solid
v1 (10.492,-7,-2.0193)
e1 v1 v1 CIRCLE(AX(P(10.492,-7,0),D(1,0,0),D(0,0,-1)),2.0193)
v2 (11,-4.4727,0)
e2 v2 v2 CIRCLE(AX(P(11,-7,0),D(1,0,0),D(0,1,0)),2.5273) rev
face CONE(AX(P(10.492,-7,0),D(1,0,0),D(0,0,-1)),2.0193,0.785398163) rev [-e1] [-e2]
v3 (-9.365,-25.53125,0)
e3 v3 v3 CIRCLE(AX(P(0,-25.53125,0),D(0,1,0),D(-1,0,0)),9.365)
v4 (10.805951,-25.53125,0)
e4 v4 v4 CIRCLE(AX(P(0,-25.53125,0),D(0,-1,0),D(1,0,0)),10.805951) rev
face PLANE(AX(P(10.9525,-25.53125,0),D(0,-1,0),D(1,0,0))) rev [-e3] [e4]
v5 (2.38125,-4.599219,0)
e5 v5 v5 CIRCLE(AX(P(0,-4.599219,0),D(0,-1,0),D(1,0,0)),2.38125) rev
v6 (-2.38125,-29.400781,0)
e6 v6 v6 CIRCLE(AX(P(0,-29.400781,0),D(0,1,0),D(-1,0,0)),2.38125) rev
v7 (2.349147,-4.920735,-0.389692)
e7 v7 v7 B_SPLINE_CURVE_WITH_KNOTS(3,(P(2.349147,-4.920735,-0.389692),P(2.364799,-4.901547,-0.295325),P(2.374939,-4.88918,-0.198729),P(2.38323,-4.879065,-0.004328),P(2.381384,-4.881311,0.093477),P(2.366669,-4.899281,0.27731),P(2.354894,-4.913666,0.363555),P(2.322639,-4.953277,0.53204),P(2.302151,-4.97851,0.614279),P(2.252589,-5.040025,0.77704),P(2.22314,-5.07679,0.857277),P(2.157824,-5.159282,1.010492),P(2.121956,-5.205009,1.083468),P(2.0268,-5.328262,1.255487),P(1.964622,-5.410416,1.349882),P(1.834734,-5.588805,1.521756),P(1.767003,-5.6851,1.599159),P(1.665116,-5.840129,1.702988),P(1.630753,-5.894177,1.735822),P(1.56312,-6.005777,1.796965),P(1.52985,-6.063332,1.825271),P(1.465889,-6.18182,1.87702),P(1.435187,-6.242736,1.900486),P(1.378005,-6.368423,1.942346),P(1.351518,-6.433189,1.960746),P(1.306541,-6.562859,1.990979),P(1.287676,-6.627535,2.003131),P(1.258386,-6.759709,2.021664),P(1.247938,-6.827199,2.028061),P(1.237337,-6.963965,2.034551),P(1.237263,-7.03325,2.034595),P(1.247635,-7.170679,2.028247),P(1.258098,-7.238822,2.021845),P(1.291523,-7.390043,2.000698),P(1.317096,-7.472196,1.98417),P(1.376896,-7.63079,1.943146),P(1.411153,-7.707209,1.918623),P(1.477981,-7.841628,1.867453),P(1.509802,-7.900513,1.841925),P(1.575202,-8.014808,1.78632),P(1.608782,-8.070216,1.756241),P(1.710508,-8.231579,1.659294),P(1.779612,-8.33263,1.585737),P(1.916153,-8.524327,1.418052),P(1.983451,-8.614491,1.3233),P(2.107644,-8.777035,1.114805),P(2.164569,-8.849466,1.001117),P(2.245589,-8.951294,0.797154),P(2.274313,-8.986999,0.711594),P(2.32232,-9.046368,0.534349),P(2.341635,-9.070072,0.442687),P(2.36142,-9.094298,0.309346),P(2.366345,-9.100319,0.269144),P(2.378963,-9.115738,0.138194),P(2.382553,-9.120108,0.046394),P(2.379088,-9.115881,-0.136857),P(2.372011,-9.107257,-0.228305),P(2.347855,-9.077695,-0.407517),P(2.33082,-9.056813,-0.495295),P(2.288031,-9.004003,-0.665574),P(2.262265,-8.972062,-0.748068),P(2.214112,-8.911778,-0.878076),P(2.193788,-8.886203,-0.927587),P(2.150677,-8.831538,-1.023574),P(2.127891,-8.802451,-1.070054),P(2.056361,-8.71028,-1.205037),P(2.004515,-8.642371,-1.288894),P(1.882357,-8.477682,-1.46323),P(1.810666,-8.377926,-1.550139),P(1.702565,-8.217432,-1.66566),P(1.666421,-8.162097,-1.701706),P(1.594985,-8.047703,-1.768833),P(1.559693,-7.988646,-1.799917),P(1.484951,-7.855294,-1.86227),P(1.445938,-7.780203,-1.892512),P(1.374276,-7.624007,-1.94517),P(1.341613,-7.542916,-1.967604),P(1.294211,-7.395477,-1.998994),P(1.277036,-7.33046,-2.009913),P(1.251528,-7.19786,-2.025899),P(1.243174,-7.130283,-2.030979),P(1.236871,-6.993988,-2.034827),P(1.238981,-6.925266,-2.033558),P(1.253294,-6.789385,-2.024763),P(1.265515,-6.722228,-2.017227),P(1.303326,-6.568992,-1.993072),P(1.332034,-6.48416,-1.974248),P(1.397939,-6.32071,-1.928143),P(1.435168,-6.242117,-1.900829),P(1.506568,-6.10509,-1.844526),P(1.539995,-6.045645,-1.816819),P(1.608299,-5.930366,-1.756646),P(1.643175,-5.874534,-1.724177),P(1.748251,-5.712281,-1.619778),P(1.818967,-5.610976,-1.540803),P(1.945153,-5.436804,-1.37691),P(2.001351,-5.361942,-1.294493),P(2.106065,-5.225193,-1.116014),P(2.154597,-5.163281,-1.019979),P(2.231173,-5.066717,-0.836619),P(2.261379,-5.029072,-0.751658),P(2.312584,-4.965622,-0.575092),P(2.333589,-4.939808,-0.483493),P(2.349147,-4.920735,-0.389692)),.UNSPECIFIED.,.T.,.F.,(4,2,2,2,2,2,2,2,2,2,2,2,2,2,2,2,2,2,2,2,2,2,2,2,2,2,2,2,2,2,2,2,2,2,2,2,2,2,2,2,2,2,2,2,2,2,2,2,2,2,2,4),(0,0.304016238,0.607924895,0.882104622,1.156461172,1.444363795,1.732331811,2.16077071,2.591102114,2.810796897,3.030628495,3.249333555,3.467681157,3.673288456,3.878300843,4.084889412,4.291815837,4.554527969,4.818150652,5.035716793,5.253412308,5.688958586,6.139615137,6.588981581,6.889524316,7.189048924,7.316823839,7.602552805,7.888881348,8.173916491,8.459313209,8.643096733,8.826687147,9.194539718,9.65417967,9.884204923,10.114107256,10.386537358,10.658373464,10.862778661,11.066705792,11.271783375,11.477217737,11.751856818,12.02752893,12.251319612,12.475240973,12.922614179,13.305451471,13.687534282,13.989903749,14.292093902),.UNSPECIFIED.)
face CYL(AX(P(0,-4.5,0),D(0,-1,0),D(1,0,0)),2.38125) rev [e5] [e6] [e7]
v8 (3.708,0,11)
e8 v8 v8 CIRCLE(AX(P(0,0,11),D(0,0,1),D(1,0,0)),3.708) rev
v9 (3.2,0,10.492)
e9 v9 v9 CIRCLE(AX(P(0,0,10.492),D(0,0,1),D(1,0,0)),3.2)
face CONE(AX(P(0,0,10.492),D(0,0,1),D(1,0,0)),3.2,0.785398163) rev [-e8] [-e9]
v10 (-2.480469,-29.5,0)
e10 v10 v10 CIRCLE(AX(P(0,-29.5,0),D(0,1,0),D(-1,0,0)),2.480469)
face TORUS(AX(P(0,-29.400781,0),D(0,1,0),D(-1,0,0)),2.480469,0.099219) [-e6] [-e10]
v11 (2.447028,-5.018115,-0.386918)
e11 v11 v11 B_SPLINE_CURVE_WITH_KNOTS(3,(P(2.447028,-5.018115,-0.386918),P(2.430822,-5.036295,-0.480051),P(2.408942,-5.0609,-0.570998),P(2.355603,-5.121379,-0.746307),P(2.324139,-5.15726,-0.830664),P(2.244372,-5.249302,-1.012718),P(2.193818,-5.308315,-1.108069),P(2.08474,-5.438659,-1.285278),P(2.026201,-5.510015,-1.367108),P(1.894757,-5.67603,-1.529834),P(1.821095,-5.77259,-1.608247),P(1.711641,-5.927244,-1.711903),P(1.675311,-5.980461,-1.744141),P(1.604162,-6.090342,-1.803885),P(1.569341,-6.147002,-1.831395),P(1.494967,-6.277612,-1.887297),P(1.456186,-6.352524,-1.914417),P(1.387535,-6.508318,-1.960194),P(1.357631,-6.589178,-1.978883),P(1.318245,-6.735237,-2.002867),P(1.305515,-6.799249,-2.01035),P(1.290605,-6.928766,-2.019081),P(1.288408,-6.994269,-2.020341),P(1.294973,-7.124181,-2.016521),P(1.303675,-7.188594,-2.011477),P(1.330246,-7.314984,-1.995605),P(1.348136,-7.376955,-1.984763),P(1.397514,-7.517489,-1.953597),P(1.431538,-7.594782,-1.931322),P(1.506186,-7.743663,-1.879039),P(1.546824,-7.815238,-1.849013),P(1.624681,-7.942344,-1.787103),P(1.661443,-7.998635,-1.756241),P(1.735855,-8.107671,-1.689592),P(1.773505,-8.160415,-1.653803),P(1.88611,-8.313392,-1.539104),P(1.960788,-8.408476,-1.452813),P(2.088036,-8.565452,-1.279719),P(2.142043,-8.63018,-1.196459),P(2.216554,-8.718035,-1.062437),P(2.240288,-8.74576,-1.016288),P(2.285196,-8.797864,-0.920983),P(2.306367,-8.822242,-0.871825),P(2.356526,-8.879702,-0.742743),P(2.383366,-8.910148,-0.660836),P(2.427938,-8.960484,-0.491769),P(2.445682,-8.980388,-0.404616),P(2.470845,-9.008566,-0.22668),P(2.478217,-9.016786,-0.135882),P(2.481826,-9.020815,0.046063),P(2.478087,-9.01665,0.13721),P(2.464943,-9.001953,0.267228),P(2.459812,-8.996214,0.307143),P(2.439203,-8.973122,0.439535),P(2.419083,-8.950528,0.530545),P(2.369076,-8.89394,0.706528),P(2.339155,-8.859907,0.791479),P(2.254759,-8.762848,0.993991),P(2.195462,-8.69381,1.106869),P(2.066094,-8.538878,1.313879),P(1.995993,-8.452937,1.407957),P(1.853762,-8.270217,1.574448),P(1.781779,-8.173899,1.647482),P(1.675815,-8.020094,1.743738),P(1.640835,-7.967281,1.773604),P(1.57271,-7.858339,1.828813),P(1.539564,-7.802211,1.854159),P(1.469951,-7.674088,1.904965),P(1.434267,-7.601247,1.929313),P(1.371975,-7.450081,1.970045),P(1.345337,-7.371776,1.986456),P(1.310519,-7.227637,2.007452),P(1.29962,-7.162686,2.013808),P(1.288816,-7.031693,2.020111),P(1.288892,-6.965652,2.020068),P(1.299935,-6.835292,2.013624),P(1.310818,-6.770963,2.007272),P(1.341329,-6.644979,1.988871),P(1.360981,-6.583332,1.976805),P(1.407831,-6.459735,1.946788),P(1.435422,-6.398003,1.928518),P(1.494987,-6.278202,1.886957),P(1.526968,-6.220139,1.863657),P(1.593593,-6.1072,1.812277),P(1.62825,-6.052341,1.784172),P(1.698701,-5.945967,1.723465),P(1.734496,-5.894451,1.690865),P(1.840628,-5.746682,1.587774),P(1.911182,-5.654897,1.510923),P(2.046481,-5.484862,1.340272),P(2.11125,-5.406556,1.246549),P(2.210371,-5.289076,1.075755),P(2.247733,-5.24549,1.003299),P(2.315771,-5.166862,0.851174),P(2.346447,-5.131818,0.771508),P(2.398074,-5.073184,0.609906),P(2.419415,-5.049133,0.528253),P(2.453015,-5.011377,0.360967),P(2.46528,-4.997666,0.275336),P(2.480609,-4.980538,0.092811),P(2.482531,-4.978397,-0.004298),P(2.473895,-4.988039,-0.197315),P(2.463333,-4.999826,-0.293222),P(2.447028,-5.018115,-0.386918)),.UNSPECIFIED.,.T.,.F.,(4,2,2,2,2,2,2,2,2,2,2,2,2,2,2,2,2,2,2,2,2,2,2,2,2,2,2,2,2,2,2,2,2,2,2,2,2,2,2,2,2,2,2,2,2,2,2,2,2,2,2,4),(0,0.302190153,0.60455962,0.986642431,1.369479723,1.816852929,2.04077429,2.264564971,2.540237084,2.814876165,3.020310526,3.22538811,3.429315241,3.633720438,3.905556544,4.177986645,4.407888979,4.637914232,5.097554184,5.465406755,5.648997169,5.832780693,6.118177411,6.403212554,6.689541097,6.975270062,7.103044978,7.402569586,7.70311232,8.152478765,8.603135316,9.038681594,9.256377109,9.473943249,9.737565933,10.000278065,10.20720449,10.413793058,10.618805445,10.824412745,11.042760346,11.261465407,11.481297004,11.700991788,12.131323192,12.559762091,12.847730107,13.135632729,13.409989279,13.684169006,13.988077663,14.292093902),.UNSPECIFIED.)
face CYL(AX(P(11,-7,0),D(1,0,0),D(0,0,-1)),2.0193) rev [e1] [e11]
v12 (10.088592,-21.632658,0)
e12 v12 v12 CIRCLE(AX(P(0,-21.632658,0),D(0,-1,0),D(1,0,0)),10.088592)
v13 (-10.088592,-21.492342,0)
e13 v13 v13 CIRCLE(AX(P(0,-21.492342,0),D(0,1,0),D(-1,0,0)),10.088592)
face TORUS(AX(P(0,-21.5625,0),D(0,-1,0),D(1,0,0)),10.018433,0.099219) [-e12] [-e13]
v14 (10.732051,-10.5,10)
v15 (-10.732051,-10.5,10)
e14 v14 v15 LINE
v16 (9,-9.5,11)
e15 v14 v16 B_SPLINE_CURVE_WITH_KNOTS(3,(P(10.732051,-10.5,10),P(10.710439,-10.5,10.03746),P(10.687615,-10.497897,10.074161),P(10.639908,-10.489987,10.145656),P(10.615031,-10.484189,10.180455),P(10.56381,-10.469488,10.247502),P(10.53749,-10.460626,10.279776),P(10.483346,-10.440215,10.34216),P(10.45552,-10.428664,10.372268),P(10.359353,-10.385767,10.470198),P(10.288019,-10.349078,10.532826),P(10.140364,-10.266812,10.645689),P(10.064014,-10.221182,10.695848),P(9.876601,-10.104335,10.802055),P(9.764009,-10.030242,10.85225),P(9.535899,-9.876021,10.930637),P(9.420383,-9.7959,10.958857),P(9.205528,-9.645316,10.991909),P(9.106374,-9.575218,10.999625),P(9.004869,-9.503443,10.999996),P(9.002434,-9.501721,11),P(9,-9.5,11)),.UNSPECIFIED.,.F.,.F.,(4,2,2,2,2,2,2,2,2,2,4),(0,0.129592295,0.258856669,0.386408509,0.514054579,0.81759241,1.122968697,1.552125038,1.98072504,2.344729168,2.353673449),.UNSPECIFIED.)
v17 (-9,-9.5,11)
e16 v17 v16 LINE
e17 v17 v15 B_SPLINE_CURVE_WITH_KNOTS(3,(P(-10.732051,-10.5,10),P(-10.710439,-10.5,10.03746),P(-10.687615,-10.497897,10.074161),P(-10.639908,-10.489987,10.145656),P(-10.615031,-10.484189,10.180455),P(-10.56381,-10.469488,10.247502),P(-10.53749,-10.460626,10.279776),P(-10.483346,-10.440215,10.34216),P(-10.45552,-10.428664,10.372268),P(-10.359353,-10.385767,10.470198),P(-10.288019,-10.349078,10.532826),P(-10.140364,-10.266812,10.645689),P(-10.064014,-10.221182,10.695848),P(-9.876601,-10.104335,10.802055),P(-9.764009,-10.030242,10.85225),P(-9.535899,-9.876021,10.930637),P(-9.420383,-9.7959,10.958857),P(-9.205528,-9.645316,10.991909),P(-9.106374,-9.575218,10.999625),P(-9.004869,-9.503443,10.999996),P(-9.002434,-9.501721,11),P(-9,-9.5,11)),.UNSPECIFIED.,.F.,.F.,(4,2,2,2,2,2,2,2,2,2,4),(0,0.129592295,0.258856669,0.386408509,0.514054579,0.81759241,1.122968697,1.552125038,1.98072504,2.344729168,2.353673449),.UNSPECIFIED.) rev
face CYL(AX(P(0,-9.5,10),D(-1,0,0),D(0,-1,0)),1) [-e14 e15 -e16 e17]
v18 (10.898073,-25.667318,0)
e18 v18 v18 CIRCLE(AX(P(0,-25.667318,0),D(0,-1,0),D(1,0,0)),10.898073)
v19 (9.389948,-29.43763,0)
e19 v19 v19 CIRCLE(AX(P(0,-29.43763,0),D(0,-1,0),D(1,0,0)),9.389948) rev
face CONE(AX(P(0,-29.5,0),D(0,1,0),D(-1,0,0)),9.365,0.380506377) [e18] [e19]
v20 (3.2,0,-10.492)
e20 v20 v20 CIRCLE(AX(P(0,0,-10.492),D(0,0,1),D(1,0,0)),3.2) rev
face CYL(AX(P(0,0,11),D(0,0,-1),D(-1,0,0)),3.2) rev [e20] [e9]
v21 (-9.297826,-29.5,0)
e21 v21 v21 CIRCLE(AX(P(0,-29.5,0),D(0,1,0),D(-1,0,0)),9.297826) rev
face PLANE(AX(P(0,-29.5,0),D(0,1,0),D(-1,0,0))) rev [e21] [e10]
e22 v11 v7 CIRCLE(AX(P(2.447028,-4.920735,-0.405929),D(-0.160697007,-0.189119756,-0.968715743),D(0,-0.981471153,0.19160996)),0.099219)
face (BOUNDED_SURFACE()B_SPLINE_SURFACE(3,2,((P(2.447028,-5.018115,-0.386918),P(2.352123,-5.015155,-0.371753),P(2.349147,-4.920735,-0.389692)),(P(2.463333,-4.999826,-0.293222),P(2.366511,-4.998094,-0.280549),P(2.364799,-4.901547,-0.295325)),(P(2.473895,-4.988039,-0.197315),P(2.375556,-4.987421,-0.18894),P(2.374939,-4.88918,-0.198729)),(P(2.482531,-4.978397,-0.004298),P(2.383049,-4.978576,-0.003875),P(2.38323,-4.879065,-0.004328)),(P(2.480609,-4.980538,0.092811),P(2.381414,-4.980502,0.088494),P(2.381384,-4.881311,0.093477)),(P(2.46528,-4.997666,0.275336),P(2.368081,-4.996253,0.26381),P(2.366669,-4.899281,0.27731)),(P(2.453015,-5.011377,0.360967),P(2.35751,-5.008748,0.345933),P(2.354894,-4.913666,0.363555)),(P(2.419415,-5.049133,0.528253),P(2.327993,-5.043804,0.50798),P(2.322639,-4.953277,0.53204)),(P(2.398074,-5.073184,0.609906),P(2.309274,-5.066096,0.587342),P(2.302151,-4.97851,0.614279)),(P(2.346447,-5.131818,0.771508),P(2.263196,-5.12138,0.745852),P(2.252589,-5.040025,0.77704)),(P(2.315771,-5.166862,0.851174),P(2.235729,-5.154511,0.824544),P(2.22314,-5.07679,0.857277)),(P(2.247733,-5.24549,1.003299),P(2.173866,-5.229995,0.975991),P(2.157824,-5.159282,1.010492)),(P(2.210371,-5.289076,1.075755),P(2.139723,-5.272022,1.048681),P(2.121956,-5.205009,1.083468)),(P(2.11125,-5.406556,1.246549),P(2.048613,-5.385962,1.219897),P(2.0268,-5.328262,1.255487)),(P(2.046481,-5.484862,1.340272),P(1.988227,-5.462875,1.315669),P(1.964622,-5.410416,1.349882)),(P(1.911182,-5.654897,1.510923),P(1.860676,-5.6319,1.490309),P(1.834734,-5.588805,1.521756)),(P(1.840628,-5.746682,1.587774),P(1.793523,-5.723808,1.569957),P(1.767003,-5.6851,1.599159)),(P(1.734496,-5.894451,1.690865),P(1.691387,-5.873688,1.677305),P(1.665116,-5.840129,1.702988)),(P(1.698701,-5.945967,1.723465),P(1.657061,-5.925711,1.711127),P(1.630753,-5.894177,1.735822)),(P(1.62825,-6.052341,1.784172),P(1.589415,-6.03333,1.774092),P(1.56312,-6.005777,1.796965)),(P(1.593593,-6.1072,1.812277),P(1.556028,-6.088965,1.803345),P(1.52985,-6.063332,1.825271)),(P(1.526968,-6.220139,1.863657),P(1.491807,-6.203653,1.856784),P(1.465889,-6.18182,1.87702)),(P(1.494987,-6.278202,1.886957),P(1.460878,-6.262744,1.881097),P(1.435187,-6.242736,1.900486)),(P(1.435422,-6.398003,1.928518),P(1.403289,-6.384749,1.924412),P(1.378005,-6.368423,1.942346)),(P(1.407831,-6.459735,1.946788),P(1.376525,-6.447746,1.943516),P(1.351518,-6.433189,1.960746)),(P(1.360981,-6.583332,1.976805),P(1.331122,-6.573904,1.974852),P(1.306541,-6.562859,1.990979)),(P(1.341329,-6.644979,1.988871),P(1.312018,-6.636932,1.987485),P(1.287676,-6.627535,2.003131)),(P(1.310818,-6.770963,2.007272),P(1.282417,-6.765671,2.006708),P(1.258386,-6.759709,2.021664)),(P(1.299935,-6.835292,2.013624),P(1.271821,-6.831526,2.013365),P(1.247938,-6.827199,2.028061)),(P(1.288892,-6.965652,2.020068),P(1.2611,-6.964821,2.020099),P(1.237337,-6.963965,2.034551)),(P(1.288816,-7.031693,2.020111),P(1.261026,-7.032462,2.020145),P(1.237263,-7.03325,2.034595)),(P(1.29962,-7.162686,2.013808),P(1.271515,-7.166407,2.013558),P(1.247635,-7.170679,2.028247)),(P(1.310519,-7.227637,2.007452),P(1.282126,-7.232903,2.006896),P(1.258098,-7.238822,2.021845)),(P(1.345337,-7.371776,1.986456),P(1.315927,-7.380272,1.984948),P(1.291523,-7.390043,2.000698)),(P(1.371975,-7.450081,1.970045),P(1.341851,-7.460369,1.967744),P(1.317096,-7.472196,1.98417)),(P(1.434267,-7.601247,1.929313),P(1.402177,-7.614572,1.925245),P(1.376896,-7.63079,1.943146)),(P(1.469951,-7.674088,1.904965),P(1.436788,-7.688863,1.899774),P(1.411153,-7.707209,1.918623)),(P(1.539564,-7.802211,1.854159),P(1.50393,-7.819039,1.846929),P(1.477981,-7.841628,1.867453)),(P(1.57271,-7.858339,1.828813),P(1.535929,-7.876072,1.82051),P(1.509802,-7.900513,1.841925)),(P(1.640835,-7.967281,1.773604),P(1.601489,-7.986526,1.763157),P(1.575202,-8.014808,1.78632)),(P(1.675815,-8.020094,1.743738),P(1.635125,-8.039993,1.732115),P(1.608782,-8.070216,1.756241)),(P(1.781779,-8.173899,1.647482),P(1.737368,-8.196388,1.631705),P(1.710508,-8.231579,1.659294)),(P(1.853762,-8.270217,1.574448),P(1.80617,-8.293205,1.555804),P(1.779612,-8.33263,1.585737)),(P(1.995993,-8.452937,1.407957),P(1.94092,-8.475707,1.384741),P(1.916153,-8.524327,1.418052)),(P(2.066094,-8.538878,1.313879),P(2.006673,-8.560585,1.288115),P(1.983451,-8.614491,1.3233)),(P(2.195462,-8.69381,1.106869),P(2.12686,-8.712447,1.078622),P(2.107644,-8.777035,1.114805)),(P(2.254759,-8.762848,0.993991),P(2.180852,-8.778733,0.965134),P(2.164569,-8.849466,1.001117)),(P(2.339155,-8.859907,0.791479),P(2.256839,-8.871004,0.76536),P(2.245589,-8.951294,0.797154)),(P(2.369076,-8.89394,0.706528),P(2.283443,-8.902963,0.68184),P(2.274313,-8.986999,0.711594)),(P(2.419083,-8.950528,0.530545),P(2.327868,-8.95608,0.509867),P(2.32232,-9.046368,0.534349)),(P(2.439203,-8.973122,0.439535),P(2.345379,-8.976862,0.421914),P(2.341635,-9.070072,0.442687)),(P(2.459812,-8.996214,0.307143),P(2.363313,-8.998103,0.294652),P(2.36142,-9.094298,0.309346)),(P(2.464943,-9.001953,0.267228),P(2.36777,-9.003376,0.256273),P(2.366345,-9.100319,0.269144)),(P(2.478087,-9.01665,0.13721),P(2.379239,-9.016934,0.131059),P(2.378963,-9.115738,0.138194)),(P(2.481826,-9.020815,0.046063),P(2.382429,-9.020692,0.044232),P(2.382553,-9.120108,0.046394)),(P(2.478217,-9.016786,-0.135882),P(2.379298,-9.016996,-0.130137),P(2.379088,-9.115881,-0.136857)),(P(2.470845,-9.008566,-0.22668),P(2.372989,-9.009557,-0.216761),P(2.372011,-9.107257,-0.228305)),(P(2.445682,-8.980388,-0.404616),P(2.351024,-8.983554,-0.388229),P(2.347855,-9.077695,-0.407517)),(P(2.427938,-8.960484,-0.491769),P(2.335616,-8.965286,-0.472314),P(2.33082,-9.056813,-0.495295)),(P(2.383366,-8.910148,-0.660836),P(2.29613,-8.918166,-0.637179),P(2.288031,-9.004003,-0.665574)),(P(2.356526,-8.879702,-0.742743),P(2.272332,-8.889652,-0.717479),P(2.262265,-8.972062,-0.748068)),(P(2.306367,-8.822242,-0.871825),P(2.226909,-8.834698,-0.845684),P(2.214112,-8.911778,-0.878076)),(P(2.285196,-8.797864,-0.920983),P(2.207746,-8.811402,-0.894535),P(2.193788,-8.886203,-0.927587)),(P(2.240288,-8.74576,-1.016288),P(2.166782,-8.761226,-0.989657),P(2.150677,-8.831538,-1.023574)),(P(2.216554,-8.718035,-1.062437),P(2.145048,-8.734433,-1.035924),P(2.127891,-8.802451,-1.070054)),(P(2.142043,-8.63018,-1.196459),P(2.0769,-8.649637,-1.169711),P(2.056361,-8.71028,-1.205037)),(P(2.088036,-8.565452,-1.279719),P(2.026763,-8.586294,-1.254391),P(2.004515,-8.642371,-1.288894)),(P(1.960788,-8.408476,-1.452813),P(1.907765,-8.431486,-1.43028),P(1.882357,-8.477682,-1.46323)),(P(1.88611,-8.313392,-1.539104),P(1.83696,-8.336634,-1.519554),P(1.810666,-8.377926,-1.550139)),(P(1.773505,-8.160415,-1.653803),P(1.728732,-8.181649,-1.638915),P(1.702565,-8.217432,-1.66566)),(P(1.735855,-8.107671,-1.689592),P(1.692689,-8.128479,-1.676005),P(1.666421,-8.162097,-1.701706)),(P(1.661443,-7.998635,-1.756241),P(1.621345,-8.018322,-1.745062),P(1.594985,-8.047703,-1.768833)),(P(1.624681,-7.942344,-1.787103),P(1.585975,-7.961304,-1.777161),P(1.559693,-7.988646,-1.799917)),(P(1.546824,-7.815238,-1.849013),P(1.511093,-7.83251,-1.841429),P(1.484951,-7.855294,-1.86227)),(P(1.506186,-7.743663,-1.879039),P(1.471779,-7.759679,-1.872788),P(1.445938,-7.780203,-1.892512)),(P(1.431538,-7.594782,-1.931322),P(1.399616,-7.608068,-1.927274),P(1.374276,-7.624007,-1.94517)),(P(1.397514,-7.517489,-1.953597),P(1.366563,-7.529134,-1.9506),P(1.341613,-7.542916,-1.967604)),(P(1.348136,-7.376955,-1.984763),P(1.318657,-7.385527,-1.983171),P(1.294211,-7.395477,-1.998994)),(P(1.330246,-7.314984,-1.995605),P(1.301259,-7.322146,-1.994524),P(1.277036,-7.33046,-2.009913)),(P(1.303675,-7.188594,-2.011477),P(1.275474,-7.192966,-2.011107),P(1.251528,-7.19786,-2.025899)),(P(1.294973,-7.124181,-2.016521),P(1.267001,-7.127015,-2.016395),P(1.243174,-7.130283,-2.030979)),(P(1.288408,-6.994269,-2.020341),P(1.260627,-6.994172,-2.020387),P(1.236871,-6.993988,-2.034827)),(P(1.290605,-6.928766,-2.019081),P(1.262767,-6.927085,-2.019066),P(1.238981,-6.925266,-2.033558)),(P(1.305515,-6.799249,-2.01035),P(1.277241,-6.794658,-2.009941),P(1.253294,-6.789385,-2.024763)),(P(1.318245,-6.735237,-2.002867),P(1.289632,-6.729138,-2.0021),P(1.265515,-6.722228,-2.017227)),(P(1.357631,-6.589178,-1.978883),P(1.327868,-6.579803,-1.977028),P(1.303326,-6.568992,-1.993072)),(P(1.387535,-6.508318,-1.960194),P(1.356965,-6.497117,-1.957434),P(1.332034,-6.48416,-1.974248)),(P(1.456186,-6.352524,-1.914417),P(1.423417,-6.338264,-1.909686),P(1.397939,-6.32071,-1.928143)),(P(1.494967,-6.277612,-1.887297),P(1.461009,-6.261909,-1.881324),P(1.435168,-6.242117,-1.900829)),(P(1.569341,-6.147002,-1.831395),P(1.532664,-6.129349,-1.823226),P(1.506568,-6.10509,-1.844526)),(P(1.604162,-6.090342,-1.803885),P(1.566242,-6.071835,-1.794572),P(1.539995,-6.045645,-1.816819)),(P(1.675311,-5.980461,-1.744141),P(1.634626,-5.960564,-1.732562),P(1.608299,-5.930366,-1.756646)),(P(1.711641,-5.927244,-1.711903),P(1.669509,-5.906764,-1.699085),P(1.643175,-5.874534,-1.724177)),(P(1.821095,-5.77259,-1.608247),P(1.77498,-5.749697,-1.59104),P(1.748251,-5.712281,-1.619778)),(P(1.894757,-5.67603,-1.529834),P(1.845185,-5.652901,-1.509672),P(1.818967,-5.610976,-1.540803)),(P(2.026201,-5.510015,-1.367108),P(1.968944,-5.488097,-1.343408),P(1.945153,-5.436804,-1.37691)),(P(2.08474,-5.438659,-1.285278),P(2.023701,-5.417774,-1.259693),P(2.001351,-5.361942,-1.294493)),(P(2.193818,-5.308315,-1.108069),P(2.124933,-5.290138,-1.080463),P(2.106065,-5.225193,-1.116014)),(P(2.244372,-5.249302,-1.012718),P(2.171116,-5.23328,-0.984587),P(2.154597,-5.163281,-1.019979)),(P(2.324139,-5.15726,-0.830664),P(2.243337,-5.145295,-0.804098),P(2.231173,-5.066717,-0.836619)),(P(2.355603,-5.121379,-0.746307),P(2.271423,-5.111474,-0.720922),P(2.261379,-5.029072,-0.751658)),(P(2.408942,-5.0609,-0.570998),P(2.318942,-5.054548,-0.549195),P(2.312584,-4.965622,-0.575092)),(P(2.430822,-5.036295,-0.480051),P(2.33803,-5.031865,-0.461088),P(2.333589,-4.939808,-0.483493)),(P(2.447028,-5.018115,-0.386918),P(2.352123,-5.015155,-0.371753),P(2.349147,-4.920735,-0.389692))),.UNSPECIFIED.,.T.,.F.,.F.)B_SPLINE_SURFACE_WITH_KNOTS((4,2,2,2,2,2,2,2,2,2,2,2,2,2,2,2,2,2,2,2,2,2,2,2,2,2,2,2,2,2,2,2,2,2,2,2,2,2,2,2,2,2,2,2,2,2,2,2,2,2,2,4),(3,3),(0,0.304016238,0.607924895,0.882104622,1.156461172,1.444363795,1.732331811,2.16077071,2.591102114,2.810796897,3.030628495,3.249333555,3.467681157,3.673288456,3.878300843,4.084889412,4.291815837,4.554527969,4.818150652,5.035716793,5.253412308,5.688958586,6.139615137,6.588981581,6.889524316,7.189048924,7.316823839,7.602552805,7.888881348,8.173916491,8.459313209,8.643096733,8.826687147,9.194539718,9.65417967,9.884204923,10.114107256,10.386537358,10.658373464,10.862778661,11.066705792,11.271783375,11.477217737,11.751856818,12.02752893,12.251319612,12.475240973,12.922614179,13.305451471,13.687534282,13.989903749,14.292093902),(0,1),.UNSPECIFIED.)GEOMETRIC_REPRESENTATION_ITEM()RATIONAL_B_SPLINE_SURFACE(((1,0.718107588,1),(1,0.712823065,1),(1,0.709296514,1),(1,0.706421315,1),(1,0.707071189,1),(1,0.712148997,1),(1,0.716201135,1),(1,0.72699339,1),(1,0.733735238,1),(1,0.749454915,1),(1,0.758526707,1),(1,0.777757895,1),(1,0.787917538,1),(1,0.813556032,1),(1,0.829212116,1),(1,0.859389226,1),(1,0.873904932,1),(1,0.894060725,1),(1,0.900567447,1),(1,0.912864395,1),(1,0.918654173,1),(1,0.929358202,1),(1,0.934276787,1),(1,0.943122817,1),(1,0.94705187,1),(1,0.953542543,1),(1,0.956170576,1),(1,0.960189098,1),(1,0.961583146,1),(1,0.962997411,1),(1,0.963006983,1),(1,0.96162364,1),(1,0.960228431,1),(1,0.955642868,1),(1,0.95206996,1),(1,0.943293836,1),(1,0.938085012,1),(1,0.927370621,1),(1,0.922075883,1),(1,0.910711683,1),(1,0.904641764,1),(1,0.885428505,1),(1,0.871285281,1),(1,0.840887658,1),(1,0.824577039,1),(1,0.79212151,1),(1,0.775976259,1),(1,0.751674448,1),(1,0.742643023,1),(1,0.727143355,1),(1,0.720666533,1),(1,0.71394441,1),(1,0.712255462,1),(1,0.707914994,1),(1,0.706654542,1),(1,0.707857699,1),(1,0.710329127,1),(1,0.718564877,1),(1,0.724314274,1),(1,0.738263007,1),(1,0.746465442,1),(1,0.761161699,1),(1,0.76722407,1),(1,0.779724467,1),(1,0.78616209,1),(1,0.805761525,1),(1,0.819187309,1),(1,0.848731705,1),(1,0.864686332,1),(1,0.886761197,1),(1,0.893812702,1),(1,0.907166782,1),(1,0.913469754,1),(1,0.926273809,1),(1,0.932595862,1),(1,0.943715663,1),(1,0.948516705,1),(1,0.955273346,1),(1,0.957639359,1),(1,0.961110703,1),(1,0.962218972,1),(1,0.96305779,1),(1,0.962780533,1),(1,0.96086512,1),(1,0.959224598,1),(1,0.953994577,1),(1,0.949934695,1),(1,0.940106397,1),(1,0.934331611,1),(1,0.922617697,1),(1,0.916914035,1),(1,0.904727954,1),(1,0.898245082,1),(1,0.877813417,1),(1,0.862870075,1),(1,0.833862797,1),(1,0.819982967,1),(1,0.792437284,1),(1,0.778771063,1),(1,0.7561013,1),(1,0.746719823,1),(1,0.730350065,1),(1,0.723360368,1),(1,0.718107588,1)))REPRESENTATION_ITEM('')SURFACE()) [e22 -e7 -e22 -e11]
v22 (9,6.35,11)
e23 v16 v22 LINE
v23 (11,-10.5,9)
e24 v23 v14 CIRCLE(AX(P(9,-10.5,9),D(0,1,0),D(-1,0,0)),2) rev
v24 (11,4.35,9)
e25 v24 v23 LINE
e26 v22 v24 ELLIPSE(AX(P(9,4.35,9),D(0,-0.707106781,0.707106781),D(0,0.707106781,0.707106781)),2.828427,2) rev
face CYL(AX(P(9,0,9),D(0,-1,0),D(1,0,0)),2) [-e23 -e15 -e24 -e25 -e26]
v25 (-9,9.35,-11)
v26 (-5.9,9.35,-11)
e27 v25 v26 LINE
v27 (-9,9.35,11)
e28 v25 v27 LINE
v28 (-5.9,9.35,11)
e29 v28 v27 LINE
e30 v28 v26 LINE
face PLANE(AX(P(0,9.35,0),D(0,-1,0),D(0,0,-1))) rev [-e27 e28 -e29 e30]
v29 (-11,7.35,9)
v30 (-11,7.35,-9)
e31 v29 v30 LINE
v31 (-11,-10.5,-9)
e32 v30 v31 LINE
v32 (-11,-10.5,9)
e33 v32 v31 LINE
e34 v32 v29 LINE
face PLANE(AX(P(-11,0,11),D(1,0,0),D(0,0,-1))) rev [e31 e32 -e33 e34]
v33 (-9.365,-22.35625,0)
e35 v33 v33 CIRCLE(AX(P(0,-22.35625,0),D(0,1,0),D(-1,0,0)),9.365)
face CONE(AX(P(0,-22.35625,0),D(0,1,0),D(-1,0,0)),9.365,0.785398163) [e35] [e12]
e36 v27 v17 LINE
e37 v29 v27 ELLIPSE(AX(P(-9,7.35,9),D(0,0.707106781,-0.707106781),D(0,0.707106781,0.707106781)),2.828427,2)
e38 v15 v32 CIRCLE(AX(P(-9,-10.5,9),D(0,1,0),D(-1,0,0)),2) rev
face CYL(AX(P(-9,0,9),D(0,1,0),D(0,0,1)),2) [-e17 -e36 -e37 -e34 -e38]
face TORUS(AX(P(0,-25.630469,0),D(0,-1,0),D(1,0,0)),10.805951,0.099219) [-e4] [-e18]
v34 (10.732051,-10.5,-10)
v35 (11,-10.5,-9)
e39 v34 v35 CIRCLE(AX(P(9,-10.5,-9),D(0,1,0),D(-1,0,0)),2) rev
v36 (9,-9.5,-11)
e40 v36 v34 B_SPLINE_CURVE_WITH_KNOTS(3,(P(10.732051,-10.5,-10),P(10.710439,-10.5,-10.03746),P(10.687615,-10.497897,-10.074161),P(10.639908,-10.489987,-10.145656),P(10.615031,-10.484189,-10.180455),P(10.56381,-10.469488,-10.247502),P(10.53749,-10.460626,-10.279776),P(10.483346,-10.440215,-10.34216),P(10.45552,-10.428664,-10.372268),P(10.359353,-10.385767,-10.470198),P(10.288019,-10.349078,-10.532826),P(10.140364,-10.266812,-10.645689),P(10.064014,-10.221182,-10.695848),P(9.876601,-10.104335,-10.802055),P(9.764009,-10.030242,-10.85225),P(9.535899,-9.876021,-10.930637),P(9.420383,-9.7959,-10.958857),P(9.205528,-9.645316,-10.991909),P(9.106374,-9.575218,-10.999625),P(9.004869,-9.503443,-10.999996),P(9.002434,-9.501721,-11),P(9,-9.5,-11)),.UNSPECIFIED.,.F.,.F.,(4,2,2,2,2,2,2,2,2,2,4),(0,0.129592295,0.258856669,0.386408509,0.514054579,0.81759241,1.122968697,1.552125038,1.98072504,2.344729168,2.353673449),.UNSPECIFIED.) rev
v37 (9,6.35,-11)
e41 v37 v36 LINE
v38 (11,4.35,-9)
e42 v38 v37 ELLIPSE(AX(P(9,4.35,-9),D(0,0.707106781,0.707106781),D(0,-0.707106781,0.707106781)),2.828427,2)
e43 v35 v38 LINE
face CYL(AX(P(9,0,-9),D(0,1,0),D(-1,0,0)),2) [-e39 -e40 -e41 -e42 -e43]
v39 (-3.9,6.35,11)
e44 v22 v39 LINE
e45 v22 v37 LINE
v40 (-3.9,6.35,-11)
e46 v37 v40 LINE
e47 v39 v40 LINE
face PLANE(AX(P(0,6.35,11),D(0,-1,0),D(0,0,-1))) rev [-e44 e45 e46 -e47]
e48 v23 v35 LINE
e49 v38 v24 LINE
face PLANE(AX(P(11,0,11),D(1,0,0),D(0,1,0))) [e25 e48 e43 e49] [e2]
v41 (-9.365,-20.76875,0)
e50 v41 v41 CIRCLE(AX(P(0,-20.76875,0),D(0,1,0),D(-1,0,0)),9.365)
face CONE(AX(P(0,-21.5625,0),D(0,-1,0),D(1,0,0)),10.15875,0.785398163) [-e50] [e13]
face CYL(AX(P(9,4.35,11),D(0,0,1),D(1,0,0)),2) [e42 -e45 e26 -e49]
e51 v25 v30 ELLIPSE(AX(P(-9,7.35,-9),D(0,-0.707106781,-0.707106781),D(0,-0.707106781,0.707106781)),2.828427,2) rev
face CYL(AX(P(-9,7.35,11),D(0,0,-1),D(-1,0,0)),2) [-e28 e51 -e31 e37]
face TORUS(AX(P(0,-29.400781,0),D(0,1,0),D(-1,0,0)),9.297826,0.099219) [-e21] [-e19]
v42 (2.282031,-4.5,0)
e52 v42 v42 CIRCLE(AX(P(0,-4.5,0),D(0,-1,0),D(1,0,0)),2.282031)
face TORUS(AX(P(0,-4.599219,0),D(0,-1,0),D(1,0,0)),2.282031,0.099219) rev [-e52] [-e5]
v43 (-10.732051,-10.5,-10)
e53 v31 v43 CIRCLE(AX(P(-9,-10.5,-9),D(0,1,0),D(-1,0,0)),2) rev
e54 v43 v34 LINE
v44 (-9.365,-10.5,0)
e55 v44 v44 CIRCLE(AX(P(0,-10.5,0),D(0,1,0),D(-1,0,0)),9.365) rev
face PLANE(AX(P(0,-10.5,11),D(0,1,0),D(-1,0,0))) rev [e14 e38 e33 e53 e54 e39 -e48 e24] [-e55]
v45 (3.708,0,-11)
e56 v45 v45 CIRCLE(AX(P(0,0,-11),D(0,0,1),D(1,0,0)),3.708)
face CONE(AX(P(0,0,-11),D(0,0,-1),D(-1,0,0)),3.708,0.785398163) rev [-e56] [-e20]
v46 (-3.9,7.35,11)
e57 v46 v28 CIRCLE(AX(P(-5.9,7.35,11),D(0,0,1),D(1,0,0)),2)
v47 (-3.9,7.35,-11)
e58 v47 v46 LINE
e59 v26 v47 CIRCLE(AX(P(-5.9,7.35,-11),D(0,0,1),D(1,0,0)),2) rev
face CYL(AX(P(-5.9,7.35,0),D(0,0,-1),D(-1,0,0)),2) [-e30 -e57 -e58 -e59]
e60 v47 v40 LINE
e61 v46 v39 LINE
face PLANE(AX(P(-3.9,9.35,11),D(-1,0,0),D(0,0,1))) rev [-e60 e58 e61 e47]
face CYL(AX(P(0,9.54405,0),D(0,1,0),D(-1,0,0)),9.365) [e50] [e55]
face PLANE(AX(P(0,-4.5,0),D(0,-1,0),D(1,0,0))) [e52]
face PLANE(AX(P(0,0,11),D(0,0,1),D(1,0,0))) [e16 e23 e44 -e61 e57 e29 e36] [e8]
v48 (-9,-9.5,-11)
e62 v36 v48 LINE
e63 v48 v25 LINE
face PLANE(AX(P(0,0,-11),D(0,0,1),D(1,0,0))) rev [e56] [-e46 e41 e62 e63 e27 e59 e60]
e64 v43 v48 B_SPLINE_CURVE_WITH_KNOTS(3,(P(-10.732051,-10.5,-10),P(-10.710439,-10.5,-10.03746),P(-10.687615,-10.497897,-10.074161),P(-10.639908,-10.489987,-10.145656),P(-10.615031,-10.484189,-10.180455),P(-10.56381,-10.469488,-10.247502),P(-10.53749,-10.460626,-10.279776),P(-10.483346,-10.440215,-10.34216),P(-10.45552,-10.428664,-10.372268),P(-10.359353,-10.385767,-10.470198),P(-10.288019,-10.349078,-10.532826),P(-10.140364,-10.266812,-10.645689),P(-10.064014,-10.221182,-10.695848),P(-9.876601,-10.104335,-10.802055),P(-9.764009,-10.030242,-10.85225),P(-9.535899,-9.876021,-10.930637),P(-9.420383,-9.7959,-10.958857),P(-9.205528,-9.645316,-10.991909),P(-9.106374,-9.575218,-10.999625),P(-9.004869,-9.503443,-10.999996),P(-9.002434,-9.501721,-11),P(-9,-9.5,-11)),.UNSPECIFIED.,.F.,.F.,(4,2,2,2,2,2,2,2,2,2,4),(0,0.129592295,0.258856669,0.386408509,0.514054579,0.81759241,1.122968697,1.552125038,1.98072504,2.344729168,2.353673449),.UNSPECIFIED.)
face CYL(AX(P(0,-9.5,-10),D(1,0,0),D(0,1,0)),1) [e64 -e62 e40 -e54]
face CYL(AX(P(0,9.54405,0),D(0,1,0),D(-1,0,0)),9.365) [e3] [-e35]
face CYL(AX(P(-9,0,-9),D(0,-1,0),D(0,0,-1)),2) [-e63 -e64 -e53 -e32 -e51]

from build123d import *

# Parameters (mm, degrees)
SKETCH1_R                   = 3.2
BOSS_EXTRUDE1_DEPTH         = 11
SKETCH3_R                   = 2.38125
CUT_EXTRUDE1_DEPTH          = 25
F_10_32_TAPPED_HOLE1_REACH  = 40.409
F_10_32_TAPPED_HOLE1_BORE_R = 2.0193
FILLET3_R                   = 0.09921875
CHAMFER1_SIZE               = 0.508
FILLET6_R                   = 1
SKETCH6_W                   = 7.1
SKETCH6_H                   = 22
BOSS_EXTRUDE2_DEPTH         = 3
FILLET7_R                   = 2
FILLET8_R                   = 2


with BuildPart() as part:
    # Sketch1 → Boss-Extrude1 (new, symmetric)
    # profile 1 of 3: a face of its own
    with BuildSketch(Plane.XY):
        with BuildLine():
            Line((-11, 6.35), (-11, 0))
            Line((-11, 0), (-6.35, 0))
            ThreePointArc((-6.35, 0), (-4.49012806, 4.490128061), (2e-09, 6.35))
            Line((2e-09, 6.35), (-11, 6.35))
        make_face()
    # profile 2 of 3: a face of its own
    with BuildSketch(Plane.XY):
        with BuildLine():
            Line((-6.35, 0), (-11, 0))
            Line((-11, 0), (-11, -10.5))
            Line((-11, -10.5), (11, -10.5))
            Line((11, -10.5), (11, 0))
            Line((11, 0), (6.35, 0))
            ThreePointArc((6.35, 0), (4.490128061, 4.49012806), (2e-09, 6.35))
            ThreePointArc((2e-09, 6.35), (-4.49012806, 4.490128061), (-6.35, 0))
        make_face()
        Circle(SKETCH1_R, mode=Mode.SUBTRACT)
    # profile 3 of 3: a face of its own
    with BuildSketch(Plane.XY):
        with BuildLine():
            Line((11, 6.35), (2e-09, 6.35))
            ThreePointArc((2e-09, 6.35), (4.490128061, 4.49012806), (6.35, 0))
            Line((6.35, 0), (11, 0))
            Line((11, 0), (11, 6.35))
        make_face()
    extrude(amount=BOSS_EXTRUDE1_DEPTH, both=True)

    # Sketch2 → Revolve1 (revolve)
    with BuildSketch(Plane.XY, mode=Mode.PRIVATE) as revolve1_sk:
        Polygon((0, -10), (9.365, -10), (9.365, -20.76875), (10.15875, -21.5625), (9.365, -22.35625), (9.365, -25.53125), (10.9525, -25.53125), (9.365, -29.5), (0, -29.5), align=None)
    revolve(revolve1_sk.sketch.rotate(Axis((0, 9.54404991, 0), (0, -1, 0)), 180), axis=Axis((0, 9.54404991, 0), (0, -1, 0)))

    # Sketch3 → Cut-Extrude1 (cut)
    with BuildSketch(Plane.XZ.offset(29.5)):
        Circle(SKETCH3_R)
    extrude(amount=-CUT_EXTRUDE1_DEPTH, mode=Mode.SUBTRACT)

    # #10-32 Tapped Hole1 bore → #10-32 Tapped Hole1 (cut, up to next)
    with BuildSketch(Plane(origin=(11, 0, 0), x_dir=(0, 0, -1), z_dir=(1, 0, 0)), mode=Mode.PRIVATE) as f_10_32_tapped_hole1_sk1:
        with Locations((0, -7)):
            Circle(F_10_32_TAPPED_HOLE1_BORE_R)
    f_10_32_tapped_hole1_tool1 = extrude(f_10_32_tapped_hole1_sk1.sketch, amount=-F_10_32_TAPPED_HOLE1_REACH, mode=Mode.PRIVATE) & part.part
    add(f_10_32_tapped_hole1_tool1.solids().sort_by_distance((11, -7, 0))[0], mode=Mode.SUBTRACT)

    # Fillet3
    fillet3_edges = [part.edges().sort_by_distance(p)[0] for p in [
        (10.15875, -21.5625, 0),
        (10.9525, -25.53125, 0),
        (9.365, -29.5, 0),
        (-2.38125, -4.5, 0),
        (-2.38125, -29.5, 0),
        (1.892404965, -8.410112563, -1.445390956),
    ]]
    fillet(fillet3_edges, radius=FILLET3_R)

    # Chamfer1
    chamfer1_edges = [part.edges().sort_by_distance(p)[0] for p in [
        (-3.2, 0, 11),
        (11, -7, 2.0193),
        (-3.2, 0, -11),
    ]]
    chamfer(chamfer1_edges, length=CHAMFER1_SIZE)

    # Fillet6
    fillet6_edges = [part.edges().sort_by_distance(p)[0] for p in [
        (0, -10.5, 11),
        (0, -10.5, -11),
    ]]
    fillet(fillet6_edges, radius=FILLET6_R)

    # Sketch6 → Boss-Extrude2 (add)
    with BuildSketch(Plane(origin=(0, 6.35, 0), x_dir=(1, 0, 0), z_dir=(0, 1, 0))):
        with Locations((-7.45, 0)):
            Rectangle(SKETCH6_W, SKETCH6_H)
    extrude(amount=BOSS_EXTRUDE2_DEPTH)

    # Fillet7
    fillet7_edges = [part.edges().sort_by_distance(p)[0] for p in [
        (11, 6.35, 0),
        (-3.9, 9.35, 0),
    ]]
    fillet(fillet7_edges, radius=FILLET7_R)

    # Fillet8
    # the kernel refuses this fillet: 2 mm, written as the material it takes off along each edge
    with BuildSketch(Plane(origin=(-11, -14.5, -11), x_dir=(1, 0, 0), z_dir=(0, 1, 0)), Plane(origin=(-11, 14.35, 11), x_dir=(1, 0, 0), z_dir=(0, -1, 0))) as fillet8_piece_1:
        with BuildLine():
            CenterArc((FILLET8_R, -FILLET8_R), FILLET8_R, 90, 90)
            Line((0, -FILLET8_R), (0, 0))
            Line((0, 0), (FILLET8_R, 0))
        make_face()
    extrude(amount=28.85, mode=Mode.SUBTRACT)
    with BuildSketch(Plane(origin=(11, 9.35, -11), x_dir=(0, 0, 1), z_dir=(0, -1, 0)), Plane(origin=(11, -14.5, 11), x_dir=(0, 0, -1), z_dir=(0, 1, 0))) as fillet8_piece_2:
        with BuildLine():
            CenterArc((FILLET8_R, FILLET8_R), FILLET8_R, 180, 90)
            Line((0, FILLET8_R), (0, 0))
            Line((0, 0), (FILLET8_R, 0))
        make_face()
    extrude(amount=23.85, mode=Mode.SUBTRACT)
    with BuildSketch(Plane(origin=(-11, 9.35, -16), x_dir=(0, -1, 0), z_dir=(0, 0, 1))) as fillet8_piece_3:
        with BuildLine():
            CenterArc((FILLET8_R, FILLET8_R), FILLET8_R, 180, 90)
            Line((0, FILLET8_R), (0, 0))
            Line((0, 0), (FILLET8_R, 0))
        make_face()
    extrude(amount=32, mode=Mode.SUBTRACT)


solid = part.part
